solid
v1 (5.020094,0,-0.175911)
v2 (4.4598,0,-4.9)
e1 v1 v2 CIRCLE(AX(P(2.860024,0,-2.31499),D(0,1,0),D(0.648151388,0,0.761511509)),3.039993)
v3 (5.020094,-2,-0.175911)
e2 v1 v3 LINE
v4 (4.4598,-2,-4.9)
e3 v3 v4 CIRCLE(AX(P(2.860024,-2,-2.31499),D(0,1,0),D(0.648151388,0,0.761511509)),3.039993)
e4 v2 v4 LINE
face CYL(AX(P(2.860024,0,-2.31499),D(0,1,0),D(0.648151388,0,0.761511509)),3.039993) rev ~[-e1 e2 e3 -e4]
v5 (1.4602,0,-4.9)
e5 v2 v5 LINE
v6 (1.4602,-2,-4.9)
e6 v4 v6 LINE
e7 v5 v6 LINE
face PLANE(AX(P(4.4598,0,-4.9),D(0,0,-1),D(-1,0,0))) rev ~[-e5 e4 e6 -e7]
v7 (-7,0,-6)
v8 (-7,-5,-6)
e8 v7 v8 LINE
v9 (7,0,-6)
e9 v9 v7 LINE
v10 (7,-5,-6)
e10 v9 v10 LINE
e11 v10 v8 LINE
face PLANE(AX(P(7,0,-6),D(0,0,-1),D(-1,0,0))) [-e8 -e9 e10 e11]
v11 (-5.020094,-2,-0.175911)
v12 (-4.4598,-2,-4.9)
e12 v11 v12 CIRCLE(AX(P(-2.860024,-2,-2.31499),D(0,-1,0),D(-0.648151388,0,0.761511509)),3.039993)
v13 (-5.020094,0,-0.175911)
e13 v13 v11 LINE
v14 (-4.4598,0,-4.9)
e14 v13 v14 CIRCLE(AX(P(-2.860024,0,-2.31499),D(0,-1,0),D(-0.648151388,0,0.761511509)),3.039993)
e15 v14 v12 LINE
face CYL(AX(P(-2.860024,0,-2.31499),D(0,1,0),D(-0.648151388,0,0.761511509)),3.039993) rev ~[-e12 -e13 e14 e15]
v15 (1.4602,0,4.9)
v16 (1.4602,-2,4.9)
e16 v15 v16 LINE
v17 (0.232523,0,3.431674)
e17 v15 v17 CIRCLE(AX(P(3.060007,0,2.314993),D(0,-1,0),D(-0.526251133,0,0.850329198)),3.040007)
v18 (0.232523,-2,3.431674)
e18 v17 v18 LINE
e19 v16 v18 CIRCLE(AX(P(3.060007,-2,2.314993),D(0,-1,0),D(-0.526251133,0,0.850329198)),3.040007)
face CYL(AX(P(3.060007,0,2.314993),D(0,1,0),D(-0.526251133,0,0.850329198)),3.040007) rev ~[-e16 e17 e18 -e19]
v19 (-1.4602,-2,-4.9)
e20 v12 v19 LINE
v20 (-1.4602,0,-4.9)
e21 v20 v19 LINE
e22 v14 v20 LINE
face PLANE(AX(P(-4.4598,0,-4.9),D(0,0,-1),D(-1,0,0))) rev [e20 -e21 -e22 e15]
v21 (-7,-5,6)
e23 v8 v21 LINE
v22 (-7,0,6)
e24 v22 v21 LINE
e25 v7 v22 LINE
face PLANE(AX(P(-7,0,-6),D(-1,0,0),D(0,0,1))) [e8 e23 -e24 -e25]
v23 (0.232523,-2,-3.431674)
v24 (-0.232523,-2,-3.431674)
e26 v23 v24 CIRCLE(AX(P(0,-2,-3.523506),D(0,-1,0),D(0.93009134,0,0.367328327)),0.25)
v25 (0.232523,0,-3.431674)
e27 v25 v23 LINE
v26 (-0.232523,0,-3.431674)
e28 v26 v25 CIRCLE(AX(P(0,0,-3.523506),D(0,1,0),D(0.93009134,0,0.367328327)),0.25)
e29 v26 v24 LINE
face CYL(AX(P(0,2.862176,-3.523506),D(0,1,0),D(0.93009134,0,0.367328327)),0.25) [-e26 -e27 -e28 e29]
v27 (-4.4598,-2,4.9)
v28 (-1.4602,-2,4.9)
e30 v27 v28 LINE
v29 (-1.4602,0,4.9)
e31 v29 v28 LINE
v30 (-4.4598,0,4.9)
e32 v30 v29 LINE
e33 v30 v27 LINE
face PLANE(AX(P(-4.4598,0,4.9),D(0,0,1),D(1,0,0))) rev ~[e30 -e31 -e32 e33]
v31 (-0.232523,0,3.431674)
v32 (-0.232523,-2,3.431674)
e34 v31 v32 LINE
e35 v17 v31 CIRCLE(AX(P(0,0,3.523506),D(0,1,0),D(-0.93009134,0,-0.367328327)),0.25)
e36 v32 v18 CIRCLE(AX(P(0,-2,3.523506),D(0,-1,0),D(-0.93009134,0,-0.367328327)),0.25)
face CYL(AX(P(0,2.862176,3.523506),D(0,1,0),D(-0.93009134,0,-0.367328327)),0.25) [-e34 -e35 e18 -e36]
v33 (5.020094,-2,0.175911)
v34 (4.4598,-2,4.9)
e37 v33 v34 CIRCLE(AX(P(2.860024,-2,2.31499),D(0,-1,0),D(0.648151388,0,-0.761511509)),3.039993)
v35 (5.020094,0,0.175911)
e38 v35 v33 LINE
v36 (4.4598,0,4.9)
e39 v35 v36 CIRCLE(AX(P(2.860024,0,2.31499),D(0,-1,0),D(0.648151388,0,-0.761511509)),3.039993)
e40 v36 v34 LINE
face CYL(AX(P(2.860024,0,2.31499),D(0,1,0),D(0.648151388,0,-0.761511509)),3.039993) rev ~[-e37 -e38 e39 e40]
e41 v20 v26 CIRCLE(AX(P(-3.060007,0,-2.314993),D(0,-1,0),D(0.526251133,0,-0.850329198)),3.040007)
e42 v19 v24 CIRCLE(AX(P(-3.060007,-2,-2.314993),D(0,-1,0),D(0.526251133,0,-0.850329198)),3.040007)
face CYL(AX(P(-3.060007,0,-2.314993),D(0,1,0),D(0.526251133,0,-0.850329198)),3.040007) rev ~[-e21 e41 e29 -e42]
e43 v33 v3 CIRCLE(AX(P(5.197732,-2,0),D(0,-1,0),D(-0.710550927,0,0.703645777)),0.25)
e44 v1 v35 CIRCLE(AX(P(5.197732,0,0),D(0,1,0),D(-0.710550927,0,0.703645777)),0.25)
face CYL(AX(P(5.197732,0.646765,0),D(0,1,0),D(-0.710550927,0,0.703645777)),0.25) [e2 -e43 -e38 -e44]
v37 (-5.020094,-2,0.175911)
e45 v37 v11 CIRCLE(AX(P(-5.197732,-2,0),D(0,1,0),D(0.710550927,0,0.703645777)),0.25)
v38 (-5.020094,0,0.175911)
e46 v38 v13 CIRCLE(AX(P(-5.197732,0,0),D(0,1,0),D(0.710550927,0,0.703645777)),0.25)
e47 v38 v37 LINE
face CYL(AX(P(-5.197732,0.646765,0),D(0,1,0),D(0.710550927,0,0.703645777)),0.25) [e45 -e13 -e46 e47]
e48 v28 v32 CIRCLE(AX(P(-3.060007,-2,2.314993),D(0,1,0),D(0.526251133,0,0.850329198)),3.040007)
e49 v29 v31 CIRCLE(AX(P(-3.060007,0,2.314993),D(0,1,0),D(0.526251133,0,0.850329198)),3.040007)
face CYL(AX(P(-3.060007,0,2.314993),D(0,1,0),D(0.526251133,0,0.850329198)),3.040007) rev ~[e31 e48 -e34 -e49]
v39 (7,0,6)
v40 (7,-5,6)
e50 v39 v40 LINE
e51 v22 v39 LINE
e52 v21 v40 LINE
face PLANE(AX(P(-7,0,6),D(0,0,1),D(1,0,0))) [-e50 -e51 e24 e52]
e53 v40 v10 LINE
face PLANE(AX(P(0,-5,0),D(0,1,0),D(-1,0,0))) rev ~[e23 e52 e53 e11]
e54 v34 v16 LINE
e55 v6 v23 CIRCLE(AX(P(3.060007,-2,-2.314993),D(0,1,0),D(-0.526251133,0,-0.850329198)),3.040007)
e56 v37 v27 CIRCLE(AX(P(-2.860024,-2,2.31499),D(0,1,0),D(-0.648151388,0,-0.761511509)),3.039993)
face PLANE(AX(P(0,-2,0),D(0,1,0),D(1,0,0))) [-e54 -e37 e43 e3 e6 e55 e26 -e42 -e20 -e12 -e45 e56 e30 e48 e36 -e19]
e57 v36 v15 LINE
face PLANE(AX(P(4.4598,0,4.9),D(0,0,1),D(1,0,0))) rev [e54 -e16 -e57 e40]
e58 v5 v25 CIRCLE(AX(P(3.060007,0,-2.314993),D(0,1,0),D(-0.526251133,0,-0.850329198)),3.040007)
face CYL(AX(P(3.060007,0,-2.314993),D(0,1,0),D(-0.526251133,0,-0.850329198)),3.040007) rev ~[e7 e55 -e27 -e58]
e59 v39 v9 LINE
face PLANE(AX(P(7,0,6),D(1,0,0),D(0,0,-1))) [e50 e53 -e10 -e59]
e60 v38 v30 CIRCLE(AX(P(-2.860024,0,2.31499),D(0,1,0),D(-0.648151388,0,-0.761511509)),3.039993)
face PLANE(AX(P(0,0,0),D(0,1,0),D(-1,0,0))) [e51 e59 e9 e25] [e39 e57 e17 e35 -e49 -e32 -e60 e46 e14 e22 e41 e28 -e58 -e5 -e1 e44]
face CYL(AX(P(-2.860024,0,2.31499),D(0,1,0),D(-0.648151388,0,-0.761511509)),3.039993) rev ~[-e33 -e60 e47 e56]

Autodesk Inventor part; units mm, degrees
ref_plane "YZ Plane" through (0, 0, 0) normal (1, 0, 0) x (0, 1, 0)
ref_plane "XZ Plane" through (0, 0, 0) normal (0, 1, 0) x (-1, 0, 0)
ref_plane "XY Plane" through (0, 0, 0) normal (0, 0, 1) x (1, 0, 0)
sketch "Sketch1" plane through (0, 0, 0) normal (0, 1, 0) x (-1, 0, 0)
  line L0 (7, 6) -> (-7, 6)
  line L1 (-7, 6) -> (-7, -6)
  line L2 (-7, -6) -> (7, -6)
  line L3 (7, -6) -> (7, 6)
  line L4 (7, 6) -> (-7, -6) construction
  line L5 (-7, 6) -> (7, -6) construction
  line L6 (4.3106, 4.4) -> (1.6094, 4.4) construction
  line L7 (1.6094, 4.4) -> (1.6094, 0.23) construction
  line L8 (1.6094, 0.23) -> (4.3106, 0.23) construction
  line L9 (4.3106, 0.23) -> (4.3106, 4.4) construction
  line L10 (4.3106, 4.4) -> (1.6094, 0.23) construction
  line L11 (1.6094, 4.4) -> (4.3106, 0.23) construction
  arc A0 (4.3106, 0.23) -> (4.3106, 4.4) centre (2.86, 2.315) ccw construction
  arc A1 (1.6094, 4.4) -> (1.6094, 0.23) centre (3.06, 2.315) ccw construction
  point P0 (0, 0)
  point P1 (2.96, 2.315)
  dimension "d0" = 12
  dimension "d1" = 14
  dimension "d2" = 4.17
  dimension "d3" = 2.54
  dimension "d4" = 4.88
  dimension "d6" = 1.6
  dimension "d7" = 1.6
extrude "Extrusion1" add sketch "Sketch1" against normal blind 5
sketch "Sketch2" plane through (0, 0, 0) normal (0, 1, 0) x (1, 0, 0)
  line L0 (-4.3106, -4.4) -> (-1.6094, -4.4) construction
  arc A0 (-4.3106, -0.23) -> (-4.3106, -4.4) centre (-2.86, -2.315) ccw construction
  arc A1 (-1.6094, -4.4) -> (-1.6094, -0.23) centre (-3.06, -2.315) ccw construction
  arc A2 (-4.8304, 0) -> (-4.4598, -4.9) centre (-2.86, -2.315) ccw
  line L1 (-4.4598, -4.9) -> (-1.4602, -4.9)
  arc A3 (-1.4602, -4.9) -> (-0.02, -2.315) centre (-3.06, -2.315) ccw
  line L2 (-7, 6) -> (-7, -6) projected
  line L3 (-7, -6) -> (7, -6) projected
  line L4 (-4.8304, 0) -> (-6.4599, 0)
  line L5 (-6.4599, 0) -> (-6.4599, -5.558) construction
  line L6 (-6.4599, -5.558) -> (0, -5.558) construction
  line L7 (0, -5.558) -> (0, -2.315) construction
  line L8 (0, -2.315) -> (-0.02, -2.315)
  line L9 (0, 8.4) -> (0, -8.4) projected
  line L10 (0, -2.315) -> (0, 0)
  line L11 (-4.8304, 0) -> (0, 0)
  dimension "d10" = 0.5
extrude "Extrusion2" cut sketch "Sketch2" against normal blind 2
mirror "Mirror1" about plane through (0, 0, 0) normal (0, 0, 1) of "Extrusion2"
mirror "Mirror2" about plane through (0, 0, 0) normal (1, 0, 0) of "Extrusion2", "Mirror1"
fillet "Fillet1" radius 0.25 6 edges at (-4.8304, -1, 0) (0.02, -1, 2.315) (0.02, -1, -2.315) (-0.02, -1, 2.315) (-0.02, -1, -2.315) (4.8304, -1, 0)
properties part number "ldr_case"
